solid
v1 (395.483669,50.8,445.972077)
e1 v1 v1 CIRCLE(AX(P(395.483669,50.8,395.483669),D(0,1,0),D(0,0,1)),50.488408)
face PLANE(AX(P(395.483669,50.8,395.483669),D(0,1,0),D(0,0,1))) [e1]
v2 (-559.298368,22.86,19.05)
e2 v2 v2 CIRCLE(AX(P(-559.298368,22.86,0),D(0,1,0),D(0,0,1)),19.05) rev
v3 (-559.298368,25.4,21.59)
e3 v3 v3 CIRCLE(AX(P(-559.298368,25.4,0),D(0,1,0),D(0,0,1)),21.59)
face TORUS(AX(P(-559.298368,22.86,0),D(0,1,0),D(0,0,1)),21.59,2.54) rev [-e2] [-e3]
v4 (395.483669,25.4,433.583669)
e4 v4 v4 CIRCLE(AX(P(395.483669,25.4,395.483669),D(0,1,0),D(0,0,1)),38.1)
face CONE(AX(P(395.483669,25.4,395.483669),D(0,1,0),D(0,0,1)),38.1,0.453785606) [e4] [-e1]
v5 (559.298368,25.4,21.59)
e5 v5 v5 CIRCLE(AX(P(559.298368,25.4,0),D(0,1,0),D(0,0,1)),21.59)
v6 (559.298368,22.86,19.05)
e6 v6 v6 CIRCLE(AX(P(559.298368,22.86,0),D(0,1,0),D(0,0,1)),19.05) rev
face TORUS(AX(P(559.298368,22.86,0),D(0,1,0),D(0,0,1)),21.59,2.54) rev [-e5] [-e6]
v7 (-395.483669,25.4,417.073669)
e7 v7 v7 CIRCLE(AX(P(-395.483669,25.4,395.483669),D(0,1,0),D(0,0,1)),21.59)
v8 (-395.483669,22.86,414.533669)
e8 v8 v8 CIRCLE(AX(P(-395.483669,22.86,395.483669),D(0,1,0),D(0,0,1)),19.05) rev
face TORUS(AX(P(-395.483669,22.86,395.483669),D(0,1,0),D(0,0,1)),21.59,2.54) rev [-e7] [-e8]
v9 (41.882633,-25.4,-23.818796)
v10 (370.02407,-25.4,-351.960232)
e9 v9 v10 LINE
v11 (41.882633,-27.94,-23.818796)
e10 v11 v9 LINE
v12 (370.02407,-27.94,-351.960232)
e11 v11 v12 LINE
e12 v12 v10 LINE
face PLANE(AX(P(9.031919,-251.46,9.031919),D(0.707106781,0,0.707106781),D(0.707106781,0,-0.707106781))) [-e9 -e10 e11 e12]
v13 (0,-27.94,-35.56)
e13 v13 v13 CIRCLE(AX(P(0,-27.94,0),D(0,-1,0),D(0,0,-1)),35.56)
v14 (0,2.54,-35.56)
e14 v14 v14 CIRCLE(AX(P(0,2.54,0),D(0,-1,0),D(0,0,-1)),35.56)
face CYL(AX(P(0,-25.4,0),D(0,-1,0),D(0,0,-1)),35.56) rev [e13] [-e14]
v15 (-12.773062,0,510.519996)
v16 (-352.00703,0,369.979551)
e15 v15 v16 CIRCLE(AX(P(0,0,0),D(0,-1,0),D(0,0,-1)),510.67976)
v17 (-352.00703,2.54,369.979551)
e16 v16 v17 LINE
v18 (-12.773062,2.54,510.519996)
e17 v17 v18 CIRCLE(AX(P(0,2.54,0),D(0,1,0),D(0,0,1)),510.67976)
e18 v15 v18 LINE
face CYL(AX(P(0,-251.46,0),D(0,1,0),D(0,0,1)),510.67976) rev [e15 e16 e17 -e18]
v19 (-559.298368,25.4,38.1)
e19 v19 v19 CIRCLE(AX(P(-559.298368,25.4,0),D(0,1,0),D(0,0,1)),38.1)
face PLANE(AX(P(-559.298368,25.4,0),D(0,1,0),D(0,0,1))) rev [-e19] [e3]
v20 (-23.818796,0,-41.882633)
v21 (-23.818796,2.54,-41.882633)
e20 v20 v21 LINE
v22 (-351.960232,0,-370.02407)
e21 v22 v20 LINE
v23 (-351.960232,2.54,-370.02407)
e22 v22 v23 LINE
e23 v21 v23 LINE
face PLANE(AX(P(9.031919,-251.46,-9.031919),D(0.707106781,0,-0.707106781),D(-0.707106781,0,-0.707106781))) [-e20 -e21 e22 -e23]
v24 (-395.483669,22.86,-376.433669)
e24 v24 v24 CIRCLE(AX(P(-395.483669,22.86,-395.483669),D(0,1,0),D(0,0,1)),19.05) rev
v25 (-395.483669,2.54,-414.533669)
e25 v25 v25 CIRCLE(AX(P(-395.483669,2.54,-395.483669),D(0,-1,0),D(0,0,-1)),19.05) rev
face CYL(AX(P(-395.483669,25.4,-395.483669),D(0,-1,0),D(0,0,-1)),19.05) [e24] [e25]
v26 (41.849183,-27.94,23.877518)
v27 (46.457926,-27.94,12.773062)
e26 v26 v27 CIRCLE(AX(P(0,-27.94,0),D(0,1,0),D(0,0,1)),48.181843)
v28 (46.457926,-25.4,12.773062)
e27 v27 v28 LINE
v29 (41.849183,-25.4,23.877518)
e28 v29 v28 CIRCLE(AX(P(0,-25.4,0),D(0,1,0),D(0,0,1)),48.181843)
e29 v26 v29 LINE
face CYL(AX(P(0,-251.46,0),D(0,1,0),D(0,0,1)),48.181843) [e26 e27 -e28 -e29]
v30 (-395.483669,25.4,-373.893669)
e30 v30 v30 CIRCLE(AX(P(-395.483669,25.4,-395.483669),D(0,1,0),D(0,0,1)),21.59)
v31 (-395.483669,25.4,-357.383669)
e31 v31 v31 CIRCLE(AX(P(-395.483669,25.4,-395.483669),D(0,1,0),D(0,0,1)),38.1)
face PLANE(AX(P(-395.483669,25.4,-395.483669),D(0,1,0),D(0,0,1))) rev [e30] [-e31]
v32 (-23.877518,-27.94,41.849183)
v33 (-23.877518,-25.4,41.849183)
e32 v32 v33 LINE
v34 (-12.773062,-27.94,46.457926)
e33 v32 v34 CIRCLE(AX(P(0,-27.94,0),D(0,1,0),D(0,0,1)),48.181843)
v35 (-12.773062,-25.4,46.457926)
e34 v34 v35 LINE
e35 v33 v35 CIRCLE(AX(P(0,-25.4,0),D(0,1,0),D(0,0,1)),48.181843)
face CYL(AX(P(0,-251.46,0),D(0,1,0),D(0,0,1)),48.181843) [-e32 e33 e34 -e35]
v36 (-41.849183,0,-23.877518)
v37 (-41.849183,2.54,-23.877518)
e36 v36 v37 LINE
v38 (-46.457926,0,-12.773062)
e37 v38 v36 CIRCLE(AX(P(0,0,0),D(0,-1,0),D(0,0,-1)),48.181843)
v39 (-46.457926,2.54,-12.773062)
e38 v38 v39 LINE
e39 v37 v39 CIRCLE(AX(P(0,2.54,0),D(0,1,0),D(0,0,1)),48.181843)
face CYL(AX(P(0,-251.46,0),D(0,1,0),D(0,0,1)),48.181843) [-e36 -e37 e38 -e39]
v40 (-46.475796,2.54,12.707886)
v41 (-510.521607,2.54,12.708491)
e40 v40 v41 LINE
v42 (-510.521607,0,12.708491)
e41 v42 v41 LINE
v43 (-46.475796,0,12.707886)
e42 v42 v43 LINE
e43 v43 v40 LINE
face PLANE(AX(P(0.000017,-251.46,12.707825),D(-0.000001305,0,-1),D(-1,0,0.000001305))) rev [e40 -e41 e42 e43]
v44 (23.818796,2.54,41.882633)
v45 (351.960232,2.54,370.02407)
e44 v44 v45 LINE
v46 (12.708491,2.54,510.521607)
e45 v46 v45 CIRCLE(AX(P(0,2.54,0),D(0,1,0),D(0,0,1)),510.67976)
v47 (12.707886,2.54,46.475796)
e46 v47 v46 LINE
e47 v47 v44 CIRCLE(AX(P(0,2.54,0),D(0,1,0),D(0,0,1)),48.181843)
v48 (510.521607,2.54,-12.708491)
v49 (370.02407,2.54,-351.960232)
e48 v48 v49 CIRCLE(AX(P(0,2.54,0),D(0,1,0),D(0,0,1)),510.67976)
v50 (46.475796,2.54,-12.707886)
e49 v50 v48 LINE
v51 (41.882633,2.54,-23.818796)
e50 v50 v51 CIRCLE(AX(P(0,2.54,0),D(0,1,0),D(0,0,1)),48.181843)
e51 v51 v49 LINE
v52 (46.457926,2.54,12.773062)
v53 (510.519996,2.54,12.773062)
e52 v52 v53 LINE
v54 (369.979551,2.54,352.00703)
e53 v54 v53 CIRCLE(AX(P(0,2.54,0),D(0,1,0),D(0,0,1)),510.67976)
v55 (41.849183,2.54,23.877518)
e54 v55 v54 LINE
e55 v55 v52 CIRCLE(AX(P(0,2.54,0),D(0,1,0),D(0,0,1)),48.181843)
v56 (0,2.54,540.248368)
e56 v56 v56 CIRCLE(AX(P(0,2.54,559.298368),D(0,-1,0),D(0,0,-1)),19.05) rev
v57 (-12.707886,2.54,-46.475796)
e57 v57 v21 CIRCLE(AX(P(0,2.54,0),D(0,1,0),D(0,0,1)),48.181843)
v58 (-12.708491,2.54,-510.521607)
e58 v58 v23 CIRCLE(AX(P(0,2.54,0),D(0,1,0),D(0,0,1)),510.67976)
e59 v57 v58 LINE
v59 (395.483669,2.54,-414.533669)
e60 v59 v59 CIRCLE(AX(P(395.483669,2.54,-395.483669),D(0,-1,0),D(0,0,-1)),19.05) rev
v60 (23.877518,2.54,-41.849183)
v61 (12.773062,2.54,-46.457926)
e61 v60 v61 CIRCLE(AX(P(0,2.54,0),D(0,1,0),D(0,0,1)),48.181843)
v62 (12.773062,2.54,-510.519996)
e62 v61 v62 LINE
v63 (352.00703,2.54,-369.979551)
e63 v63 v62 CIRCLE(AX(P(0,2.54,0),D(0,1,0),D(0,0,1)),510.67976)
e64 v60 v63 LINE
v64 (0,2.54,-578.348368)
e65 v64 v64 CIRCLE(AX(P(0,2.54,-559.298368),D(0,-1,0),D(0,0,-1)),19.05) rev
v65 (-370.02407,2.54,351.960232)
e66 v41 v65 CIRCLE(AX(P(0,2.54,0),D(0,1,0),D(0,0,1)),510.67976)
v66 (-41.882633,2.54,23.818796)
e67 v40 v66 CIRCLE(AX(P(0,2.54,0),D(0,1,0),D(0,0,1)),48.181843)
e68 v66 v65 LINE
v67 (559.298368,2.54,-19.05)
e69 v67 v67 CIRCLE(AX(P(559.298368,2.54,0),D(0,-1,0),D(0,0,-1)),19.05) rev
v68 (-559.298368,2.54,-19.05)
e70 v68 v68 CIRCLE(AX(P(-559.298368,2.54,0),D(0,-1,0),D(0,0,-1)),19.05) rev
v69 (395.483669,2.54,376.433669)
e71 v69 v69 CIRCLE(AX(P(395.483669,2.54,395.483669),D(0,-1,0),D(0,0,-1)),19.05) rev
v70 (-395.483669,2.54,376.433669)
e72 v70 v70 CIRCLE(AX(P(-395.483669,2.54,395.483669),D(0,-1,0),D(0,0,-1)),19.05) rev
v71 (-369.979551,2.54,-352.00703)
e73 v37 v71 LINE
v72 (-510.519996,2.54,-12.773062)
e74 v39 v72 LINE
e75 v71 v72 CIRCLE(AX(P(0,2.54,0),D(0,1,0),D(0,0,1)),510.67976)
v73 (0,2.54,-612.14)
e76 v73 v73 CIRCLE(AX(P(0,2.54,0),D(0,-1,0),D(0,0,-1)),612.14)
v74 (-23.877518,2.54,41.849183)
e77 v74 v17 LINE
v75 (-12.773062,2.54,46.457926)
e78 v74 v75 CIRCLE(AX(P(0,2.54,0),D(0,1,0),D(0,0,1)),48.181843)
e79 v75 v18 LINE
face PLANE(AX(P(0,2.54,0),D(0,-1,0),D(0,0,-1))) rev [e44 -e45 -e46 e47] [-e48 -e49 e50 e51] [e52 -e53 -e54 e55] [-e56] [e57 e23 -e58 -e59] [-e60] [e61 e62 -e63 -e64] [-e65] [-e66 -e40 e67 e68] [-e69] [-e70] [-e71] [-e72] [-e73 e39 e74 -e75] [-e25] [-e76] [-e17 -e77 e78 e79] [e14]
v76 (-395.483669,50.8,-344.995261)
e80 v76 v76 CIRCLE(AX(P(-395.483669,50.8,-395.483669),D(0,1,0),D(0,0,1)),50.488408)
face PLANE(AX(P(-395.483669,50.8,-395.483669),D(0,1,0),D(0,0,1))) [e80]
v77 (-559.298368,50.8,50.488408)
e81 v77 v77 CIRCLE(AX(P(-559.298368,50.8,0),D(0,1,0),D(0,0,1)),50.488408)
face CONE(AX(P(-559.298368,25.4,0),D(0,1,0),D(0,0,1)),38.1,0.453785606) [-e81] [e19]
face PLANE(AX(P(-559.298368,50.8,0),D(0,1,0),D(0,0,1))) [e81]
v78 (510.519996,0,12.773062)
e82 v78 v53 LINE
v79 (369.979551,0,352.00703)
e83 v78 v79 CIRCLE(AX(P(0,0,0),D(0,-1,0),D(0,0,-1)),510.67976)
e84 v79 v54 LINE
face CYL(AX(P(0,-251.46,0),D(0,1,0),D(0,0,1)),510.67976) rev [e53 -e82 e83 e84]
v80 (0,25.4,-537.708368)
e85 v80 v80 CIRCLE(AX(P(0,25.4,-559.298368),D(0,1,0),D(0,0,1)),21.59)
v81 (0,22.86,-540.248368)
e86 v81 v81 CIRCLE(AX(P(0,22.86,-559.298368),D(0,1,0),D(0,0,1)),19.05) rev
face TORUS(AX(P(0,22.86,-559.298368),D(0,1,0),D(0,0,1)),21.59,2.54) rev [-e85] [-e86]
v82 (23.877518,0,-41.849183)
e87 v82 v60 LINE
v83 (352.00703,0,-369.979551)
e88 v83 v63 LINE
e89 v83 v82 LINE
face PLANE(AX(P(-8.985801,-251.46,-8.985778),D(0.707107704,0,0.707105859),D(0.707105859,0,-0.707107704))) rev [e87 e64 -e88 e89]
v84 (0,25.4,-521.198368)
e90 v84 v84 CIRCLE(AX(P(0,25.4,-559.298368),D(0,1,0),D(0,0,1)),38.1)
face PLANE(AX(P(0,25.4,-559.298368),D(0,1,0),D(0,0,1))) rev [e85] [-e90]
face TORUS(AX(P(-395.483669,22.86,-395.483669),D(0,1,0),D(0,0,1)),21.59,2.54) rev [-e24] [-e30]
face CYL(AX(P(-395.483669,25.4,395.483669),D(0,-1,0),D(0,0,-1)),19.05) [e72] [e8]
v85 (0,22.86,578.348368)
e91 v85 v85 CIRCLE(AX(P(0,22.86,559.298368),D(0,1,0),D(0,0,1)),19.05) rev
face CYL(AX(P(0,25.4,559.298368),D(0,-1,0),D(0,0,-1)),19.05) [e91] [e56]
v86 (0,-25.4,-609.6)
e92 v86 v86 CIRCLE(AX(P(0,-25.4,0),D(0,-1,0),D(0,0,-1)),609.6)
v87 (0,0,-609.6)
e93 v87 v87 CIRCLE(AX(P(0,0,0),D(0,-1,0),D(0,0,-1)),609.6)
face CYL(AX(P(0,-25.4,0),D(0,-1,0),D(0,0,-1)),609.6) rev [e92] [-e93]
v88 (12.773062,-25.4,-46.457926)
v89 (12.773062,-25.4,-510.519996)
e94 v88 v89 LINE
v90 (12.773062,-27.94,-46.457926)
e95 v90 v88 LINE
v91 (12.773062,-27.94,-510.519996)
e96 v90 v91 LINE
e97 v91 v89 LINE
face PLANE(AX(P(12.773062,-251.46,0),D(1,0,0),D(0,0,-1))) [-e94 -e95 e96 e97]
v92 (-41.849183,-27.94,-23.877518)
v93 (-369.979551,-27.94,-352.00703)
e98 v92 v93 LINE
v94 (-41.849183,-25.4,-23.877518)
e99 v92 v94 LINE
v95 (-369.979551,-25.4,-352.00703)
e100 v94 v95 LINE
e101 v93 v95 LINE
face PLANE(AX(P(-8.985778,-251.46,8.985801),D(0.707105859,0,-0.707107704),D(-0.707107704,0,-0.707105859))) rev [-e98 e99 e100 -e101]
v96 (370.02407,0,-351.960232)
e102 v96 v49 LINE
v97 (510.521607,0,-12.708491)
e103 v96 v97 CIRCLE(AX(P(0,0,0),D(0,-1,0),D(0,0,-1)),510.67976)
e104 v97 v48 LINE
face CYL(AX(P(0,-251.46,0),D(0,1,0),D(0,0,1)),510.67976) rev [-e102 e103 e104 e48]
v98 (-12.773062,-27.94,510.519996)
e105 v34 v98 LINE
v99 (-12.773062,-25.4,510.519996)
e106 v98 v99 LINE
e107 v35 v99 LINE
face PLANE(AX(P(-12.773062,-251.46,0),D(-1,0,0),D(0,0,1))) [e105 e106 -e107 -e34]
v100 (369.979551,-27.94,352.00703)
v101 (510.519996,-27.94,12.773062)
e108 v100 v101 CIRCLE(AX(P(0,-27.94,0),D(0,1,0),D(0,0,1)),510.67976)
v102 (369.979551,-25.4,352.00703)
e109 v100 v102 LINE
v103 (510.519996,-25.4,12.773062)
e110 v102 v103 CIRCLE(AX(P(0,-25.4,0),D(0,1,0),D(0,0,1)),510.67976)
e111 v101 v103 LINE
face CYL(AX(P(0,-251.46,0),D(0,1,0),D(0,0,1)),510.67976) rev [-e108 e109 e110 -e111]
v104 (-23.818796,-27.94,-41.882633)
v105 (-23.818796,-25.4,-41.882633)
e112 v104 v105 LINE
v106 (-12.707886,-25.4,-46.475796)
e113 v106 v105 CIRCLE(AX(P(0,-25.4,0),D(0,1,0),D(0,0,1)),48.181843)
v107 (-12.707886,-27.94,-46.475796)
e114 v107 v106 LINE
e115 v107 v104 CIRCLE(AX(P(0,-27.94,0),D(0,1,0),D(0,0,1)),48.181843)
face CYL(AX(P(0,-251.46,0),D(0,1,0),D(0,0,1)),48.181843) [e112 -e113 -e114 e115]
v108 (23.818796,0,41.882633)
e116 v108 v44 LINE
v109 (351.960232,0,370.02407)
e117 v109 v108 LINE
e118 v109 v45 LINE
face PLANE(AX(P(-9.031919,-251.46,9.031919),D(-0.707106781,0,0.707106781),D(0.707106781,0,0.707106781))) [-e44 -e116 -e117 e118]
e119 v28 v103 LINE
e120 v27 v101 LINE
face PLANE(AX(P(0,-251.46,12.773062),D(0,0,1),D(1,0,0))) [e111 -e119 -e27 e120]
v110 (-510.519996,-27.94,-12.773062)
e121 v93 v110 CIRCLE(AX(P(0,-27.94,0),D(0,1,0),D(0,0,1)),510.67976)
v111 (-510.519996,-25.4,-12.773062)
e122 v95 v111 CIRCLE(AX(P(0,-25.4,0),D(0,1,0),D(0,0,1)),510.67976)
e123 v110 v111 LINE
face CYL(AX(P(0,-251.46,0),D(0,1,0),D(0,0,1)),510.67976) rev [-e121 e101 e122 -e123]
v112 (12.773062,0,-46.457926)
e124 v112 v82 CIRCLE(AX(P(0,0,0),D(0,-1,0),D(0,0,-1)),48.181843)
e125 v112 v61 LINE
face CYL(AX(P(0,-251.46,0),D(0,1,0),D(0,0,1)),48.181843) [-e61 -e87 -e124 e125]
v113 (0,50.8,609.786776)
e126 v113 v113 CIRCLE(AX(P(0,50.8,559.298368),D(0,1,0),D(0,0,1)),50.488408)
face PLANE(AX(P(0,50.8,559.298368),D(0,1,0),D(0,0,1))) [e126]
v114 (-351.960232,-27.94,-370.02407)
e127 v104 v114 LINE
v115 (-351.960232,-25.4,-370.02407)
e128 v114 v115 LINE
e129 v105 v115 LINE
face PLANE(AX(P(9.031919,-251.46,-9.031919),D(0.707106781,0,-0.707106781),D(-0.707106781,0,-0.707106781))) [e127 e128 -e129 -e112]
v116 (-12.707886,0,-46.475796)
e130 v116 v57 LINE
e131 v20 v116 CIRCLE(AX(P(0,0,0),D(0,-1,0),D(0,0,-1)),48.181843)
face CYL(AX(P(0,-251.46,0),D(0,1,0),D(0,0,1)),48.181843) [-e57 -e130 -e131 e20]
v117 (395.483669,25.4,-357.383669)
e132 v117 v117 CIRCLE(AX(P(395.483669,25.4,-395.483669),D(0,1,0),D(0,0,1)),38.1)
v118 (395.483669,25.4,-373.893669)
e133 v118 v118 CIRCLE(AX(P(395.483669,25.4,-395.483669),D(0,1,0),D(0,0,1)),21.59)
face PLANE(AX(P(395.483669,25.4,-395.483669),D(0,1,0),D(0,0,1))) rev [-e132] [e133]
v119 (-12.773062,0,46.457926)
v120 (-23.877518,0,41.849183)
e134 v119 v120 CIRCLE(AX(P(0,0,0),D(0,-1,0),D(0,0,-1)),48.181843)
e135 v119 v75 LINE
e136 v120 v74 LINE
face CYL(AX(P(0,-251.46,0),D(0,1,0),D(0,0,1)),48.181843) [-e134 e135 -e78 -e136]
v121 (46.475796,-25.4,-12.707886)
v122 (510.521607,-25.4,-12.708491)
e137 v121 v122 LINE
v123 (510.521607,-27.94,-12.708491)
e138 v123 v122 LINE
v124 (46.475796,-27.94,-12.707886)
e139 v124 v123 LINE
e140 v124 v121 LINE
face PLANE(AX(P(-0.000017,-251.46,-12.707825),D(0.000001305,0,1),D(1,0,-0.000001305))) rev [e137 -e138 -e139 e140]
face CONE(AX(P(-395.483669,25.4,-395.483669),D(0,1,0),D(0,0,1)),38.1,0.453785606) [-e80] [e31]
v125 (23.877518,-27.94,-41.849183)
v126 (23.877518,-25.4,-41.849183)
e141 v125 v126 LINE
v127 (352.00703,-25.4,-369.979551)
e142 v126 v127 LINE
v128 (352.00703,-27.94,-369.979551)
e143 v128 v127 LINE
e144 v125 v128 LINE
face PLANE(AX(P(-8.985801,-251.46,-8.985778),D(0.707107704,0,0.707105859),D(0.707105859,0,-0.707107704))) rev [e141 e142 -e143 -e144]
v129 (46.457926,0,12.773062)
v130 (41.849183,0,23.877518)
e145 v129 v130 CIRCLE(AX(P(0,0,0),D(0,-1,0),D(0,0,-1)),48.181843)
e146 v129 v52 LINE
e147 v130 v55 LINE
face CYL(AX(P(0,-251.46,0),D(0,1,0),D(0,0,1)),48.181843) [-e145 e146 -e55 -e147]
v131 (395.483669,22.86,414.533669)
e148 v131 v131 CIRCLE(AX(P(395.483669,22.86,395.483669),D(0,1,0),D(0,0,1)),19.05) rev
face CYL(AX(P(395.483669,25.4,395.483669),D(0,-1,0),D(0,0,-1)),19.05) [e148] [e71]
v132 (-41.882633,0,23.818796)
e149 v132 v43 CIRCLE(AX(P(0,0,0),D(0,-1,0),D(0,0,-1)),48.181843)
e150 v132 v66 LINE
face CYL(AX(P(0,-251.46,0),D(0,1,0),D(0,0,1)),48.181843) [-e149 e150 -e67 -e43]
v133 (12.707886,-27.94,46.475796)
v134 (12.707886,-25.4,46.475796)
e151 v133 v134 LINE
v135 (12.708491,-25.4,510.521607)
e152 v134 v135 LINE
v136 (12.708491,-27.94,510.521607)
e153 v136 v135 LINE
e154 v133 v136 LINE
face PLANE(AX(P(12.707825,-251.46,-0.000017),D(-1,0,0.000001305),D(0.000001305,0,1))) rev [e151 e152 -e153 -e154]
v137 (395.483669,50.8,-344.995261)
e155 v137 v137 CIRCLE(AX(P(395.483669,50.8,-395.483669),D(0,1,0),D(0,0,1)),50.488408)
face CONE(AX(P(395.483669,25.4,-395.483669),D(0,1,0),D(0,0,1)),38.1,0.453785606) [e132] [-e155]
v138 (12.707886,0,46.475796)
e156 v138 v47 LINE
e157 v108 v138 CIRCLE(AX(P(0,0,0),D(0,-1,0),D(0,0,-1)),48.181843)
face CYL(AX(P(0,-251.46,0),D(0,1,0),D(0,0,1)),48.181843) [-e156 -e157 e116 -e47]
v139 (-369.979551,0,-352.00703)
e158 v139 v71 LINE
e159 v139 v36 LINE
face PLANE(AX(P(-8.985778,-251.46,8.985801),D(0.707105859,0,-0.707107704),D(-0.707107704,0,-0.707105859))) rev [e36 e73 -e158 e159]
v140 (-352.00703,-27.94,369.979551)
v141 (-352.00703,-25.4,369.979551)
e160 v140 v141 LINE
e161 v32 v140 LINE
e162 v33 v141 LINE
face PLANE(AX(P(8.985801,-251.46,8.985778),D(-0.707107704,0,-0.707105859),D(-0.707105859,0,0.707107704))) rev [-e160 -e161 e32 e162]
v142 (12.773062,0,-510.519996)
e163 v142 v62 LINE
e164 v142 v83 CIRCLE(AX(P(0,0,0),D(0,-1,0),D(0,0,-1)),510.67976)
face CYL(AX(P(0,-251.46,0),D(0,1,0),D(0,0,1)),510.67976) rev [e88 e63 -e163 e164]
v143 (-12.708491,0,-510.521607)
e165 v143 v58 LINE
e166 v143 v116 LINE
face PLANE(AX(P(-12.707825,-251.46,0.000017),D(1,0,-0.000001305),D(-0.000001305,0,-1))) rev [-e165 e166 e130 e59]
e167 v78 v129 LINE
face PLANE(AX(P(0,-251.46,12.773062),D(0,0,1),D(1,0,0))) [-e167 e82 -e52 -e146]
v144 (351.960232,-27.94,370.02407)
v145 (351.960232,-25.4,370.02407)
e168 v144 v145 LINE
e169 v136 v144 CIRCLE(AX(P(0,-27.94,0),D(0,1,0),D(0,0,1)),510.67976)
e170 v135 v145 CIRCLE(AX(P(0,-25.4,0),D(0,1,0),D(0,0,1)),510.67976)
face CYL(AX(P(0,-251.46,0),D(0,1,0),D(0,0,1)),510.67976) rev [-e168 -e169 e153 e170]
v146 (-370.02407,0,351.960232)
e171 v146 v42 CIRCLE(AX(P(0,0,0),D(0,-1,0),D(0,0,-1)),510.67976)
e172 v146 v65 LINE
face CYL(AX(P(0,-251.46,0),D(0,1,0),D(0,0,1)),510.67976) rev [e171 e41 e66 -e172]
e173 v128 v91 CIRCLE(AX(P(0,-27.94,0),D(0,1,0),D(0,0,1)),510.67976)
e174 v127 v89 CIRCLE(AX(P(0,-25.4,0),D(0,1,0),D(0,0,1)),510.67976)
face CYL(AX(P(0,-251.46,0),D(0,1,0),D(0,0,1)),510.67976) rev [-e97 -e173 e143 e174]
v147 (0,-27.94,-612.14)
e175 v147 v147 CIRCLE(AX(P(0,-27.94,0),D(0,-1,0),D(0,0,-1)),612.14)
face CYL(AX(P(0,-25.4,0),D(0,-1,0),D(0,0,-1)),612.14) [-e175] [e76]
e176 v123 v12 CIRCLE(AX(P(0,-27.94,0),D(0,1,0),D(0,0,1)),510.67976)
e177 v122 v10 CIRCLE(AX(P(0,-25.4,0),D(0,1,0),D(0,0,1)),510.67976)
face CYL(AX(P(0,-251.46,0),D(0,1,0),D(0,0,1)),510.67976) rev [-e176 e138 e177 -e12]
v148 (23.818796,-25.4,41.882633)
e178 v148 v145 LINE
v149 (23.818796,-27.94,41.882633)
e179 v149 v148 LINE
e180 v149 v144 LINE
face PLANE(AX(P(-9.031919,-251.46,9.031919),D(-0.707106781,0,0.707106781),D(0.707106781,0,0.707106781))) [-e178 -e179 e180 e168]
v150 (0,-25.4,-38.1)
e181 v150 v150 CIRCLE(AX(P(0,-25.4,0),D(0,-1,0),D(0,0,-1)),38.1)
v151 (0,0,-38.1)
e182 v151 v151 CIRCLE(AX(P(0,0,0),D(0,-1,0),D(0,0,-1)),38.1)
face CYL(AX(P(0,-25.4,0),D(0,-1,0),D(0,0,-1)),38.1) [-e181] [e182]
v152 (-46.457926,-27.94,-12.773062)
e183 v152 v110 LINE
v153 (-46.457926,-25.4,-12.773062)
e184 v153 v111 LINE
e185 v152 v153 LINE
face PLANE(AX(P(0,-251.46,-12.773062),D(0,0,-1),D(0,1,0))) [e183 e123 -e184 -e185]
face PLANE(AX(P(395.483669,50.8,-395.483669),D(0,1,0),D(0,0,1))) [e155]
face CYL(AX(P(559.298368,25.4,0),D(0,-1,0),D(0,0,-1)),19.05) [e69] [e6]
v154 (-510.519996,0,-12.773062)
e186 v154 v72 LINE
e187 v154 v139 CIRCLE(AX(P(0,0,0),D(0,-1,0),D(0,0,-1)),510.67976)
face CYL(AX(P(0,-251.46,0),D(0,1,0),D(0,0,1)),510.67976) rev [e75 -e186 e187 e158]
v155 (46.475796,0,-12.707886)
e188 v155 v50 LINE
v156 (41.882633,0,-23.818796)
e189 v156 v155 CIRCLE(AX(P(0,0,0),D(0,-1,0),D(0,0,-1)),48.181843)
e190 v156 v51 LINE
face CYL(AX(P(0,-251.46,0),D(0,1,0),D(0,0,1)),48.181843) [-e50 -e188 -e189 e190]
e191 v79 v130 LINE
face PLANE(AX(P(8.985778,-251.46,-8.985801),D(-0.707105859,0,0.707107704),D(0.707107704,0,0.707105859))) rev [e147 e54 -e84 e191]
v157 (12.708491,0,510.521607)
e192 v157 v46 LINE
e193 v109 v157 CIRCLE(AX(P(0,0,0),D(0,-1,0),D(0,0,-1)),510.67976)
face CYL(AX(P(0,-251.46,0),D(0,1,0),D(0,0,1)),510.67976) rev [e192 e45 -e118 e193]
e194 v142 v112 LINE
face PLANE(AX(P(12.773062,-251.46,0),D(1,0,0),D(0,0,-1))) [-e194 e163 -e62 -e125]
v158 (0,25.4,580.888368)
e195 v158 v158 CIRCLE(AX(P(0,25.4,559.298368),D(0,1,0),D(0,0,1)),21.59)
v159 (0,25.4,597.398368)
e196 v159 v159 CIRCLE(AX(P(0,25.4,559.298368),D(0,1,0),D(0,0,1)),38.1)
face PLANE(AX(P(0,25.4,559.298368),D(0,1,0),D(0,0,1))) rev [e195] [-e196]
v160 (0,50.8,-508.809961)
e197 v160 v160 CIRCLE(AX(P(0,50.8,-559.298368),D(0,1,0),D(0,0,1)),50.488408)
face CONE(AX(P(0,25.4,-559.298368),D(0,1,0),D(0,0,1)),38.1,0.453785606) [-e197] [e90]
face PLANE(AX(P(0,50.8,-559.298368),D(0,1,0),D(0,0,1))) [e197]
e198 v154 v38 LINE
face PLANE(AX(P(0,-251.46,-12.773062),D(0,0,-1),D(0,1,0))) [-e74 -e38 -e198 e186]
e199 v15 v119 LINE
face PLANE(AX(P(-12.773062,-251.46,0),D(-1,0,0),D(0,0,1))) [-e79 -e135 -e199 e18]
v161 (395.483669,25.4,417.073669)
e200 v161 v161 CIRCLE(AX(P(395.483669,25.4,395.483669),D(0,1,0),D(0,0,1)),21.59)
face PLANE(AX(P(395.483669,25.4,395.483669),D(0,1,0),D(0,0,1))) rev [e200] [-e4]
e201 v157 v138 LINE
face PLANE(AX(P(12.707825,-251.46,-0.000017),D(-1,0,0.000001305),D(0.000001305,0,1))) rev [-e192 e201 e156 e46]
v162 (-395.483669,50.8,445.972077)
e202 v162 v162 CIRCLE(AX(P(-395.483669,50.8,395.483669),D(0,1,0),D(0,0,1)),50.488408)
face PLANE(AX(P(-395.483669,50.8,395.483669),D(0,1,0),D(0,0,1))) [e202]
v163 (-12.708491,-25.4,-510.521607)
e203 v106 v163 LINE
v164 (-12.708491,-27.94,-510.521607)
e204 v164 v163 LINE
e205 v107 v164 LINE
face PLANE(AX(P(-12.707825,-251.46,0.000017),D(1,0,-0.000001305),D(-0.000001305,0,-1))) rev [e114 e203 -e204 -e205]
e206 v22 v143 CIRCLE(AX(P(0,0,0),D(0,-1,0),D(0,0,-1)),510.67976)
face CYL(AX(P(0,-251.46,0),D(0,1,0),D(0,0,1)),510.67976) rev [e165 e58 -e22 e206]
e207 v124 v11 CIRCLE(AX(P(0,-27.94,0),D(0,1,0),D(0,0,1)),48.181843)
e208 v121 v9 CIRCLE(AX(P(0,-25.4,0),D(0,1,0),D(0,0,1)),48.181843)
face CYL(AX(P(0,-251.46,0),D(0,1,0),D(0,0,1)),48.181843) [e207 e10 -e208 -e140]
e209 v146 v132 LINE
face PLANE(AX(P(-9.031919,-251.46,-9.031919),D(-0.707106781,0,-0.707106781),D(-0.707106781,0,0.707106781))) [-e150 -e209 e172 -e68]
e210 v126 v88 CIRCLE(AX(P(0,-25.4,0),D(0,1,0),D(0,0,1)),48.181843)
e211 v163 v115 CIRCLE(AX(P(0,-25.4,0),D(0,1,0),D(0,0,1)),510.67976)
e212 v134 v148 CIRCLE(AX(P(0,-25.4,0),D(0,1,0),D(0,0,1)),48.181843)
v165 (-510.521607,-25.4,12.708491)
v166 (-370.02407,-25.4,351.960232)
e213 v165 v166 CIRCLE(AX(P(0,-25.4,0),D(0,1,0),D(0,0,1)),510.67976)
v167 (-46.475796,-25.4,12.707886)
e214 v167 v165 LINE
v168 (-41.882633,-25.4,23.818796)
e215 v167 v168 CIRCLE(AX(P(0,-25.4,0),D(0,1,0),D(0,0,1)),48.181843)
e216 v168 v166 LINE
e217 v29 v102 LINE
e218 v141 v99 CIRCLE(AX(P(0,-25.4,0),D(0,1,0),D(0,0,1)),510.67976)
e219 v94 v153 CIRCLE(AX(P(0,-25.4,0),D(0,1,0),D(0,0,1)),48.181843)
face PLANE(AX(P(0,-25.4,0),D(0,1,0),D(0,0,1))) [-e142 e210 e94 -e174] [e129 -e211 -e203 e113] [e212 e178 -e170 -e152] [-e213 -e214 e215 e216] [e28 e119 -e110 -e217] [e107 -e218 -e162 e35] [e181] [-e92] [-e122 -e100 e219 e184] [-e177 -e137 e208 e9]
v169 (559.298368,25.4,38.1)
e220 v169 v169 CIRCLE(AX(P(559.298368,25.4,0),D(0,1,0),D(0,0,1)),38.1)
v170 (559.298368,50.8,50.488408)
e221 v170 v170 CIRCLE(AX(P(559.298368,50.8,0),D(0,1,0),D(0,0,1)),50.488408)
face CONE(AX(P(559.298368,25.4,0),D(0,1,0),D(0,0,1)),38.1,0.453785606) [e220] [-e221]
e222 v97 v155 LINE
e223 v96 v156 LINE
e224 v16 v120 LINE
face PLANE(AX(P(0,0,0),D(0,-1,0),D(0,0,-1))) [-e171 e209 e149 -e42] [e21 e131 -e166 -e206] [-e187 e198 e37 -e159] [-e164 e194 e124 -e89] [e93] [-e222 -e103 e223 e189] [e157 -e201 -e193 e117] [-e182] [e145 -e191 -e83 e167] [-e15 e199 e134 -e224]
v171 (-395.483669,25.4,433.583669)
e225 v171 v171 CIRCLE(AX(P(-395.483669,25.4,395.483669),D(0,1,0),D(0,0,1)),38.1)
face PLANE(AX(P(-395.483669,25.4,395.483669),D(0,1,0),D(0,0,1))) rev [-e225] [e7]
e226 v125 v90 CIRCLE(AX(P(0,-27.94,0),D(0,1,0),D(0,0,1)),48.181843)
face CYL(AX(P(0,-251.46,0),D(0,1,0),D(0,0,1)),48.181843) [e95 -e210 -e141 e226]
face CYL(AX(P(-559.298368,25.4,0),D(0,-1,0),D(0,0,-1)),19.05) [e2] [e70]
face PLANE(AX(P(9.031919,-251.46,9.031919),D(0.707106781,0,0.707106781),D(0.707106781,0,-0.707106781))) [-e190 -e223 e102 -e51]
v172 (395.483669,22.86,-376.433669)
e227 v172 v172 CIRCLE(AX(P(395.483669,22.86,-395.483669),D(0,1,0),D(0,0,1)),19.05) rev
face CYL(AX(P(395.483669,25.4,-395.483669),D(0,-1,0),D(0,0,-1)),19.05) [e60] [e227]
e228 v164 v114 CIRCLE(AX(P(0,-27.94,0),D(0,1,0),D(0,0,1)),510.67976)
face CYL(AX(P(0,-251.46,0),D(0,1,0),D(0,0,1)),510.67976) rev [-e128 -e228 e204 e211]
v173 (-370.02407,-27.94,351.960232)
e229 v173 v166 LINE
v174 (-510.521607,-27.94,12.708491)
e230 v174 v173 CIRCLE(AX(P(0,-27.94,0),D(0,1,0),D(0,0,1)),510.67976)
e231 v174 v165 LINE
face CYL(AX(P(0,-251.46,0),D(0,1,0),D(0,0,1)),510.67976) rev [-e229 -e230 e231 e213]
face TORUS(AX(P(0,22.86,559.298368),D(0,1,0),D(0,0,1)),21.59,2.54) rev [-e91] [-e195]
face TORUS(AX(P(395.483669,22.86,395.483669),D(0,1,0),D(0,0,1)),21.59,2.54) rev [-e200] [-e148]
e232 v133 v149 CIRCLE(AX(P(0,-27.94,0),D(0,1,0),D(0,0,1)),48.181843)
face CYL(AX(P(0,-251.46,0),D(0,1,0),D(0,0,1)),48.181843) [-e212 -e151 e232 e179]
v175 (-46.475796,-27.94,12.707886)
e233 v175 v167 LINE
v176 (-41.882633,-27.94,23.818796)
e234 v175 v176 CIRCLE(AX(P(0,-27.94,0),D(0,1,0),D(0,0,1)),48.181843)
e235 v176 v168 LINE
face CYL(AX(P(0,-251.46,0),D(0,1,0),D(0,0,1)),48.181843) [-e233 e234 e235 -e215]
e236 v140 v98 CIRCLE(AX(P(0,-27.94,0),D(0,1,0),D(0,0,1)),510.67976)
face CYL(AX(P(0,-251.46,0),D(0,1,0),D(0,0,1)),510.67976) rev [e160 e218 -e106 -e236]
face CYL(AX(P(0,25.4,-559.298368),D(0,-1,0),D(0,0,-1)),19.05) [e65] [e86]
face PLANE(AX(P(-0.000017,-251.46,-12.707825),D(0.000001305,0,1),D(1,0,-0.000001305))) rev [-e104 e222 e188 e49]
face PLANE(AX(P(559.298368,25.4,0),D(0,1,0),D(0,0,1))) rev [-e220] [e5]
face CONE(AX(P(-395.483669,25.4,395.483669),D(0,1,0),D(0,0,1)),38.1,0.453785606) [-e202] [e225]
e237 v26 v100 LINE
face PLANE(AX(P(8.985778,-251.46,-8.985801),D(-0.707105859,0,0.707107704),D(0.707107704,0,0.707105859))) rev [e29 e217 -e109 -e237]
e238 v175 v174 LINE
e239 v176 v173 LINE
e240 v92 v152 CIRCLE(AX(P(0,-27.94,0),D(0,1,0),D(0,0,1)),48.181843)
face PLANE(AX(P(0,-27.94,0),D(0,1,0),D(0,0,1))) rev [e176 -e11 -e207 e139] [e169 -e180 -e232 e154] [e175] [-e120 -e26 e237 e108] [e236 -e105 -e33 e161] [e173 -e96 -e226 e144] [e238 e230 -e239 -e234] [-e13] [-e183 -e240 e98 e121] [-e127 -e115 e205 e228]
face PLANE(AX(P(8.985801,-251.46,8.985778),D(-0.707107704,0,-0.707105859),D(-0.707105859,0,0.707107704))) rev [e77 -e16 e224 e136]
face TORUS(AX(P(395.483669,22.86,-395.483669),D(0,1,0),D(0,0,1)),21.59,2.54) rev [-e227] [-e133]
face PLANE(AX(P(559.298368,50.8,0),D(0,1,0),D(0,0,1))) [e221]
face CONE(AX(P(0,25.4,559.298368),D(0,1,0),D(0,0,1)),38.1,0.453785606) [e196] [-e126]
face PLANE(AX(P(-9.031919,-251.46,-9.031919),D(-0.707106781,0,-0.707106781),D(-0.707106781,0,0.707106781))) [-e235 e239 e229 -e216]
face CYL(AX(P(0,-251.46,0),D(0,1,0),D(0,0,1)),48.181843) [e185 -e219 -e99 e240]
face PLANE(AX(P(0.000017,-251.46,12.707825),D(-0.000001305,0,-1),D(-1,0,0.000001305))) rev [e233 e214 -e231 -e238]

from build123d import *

# Parameters (mm, degrees)
REVOLVE_THIN1_START           = -27.94
REVOLVE_THIN1_OUTLINE_R       = 612.14
REVOLVE_THIN1_OUTLINE_R_2     = 35.56
REVOLVE_THIN1_DEPTH           = 2.54
REVOLVE_THIN1_2_OUTLINE_R     = 612.14
REVOLVE_THIN1_2_OUTLINE_R_2   = 35.56
REVOLVE_THIN1_2_DEPTH         = 2.54
REVOLVE_THIN1_START_2         = -25.4
REVOLVE_THIN1_3_OUTLINE_R     = 612.14
REVOLVE_THIN1_3_OUTLINE_R_2   = 609.6
REVOLVE_THIN1_3_OUTLINE_R_3   = 38.1
REVOLVE_THIN1_3_OUTLINE_R_4   = 35.56
REVOLVE_THIN1_3_DEPTH         = 25.4
CUT_EXTRUDE4_DEPTH            = 254
SKETCH4_R                     = 19.05
BOSS_EXTRUDE1_DEPTH           = 25.4
SKETCH5_R                     = 38.1
BOSS_EXTRUDE2_DEPTH           = 25.4
BOSS_EXTRUDE2_DRAFT           = -26
BOSS_EXTRUDE2_PROFILE_2_DEPTH = 25.4
BOSS_EXTRUDE2_PROFILE_2_DRAFT = -26
BOSS_EXTRUDE2_PROFILE_3_DEPTH = 25.4
BOSS_EXTRUDE2_PROFILE_3_DRAFT = -26
BOSS_EXTRUDE2_PROFILE_4_DEPTH = 25.4
BOSS_EXTRUDE2_PROFILE_4_DRAFT = -26
BOSS_EXTRUDE2_PROFILE_5_DEPTH = 25.4
BOSS_EXTRUDE2_PROFILE_5_DRAFT = -26
BOSS_EXTRUDE2_PROFILE_6_DEPTH = 25.4
BOSS_EXTRUDE2_PROFILE_6_DRAFT = -26
BOSS_EXTRUDE2_PROFILE_7_DEPTH = 25.4
BOSS_EXTRUDE2_PROFILE_7_DRAFT = -26
BOSS_EXTRUDE2_PROFILE_8_DEPTH = 25.4
BOSS_EXTRUDE2_PROFILE_8_DRAFT = -26
FILLET1_R                     = 2.54
FILLET2_R                     = 2.54


# Read off the part's stored shape, not the designer's step: Revolve-Thin1
with BuildPart() as part:
    # Revolve-Thin1 outline → Revolve-Thin1 (new body)
    with BuildSketch(Plane(origin=(0, 0, 0), x_dir=(1, 0, 0), z_dir=(0, 1, 0)).offset(REVOLVE_THIN1_START)):
        Circle(REVOLVE_THIN1_OUTLINE_R)
        Circle(REVOLVE_THIN1_OUTLINE_R_2, mode=Mode.SUBTRACT)
    extrude(amount=REVOLVE_THIN1_DEPTH)



with BuildPart() as body_2:
    # Revolve-Thin1 2 outline → Revolve-Thin1 2 (new body)
    with BuildSketch(Plane(origin=(0, 0, 0), x_dir=(1, 0, 0), z_dir=(0, 1, 0))):
        Circle(REVOLVE_THIN1_2_OUTLINE_R)
        Circle(REVOLVE_THIN1_2_OUTLINE_R_2, mode=Mode.SUBTRACT)
    extrude(amount=REVOLVE_THIN1_2_DEPTH)


with BuildPart() as part_1:
    add(part.part)

    add(body_2.part)  # Revolve-Thin1 3 merges body 2
    # Revolve-Thin1 3 outline → Revolve-Thin1 3 (add)
    # profile 1 of 2: a face of its own
    with BuildSketch(Plane(origin=(0, 0, 0), x_dir=(1, 0, 0), z_dir=(0, 1, 0)).offset(REVOLVE_THIN1_START_2)):
        Circle(REVOLVE_THIN1_3_OUTLINE_R)
        Circle(REVOLVE_THIN1_3_OUTLINE_R_2, mode=Mode.SUBTRACT)
    # profile 2 of 2: a face of its own
    with BuildSketch(Plane(origin=(0, 0, 0), x_dir=(1, 0, 0), z_dir=(0, 1, 0)).offset(REVOLVE_THIN1_START_2)):
        Circle(REVOLVE_THIN1_3_OUTLINE_R_3)
        Circle(REVOLVE_THIN1_3_OUTLINE_R_4, mode=Mode.SUBTRACT)
    extrude(amount=REVOLVE_THIN1_3_DEPTH)

    # Sketch3 → Cut-Extrude4 (cut)
    with BuildSketch(Plane(origin=(0, 2.54, 0), x_dir=(1, 0, 0), z_dir=(0, 1, 0))):
        with BuildLine():
            ThreePointArc((-12.707885841, 46.475796004), (-18.407169885, 44.527138619), (-23.818795726, 41.882632999))
            Line((-23.818795726, 41.882632999), (-351.960232421, 370.024069694))
            ThreePointArc((-351.960232421, 370.024069694), (-195.398846018, 471.818935963), (-12.708491222, 510.521607387))
            Line((-12.708491222, 510.521607387), (-12.707885841, 46.475796004))
        make_face()
        with BuildLine():
            Line((23.877518263, 41.849182768), (352.007030204, 369.979550847))
            ThreePointArc((352.007030204, 369.979550847), (195.458520056, 471.794218167), (12.77306183, 510.519995935))
            Line((12.77306183, 510.519995935), (12.77306183, 46.457925785))
            ThreePointArc((12.77306183, 46.457925785), (18.469607017, 44.501276312), (23.877518263, 41.849182768))
        make_face()
        with BuildLine():
            Line((46.475796004, 12.707885841), (510.521607387, 12.708491222))
            ThreePointArc((510.521607387, 12.708491222), (471.818935963, 195.398846018), (370.024069694, 351.960232421))
            Line((370.024069694, 351.960232421), (41.882632999, 23.818795726))
            ThreePointArc((41.882632999, 23.818795726), (44.527138619, 18.407169885), (46.475796004, 12.707885841))
        make_face()
        with BuildLine():
            Line((41.849182768, -23.877518263), (369.979550847, -352.007030204))
            ThreePointArc((369.979550847, -352.007030204), (471.794218167, -195.458520056), (510.519995935, -12.77306183))
            Line((510.519995935, -12.77306183), (46.457925785, -12.77306183))
            ThreePointArc((46.457925785, -12.77306183), (44.501276312, -18.469607017), (41.849182768, -23.877518263))
        make_face()
        with BuildLine():
            Line((12.707885841, -46.475796004), (12.708491222, -510.521607387))
            ThreePointArc((12.708491222, -510.521607387), (195.398846018, -471.818935963), (351.960232421, -370.024069694))
            Line((351.960232421, -370.024069694), (23.818795726, -41.882632999))
            ThreePointArc((23.818795726, -41.882632999), (18.407169885, -44.527138619), (12.707885841, -46.475796004))
        make_face()
        with BuildLine():
            Line((-23.877518263, -41.849182768), (-352.007030204, -369.979550847))
            ThreePointArc((-352.007030204, -369.979550847), (-195.458520056, -471.794218167), (-12.77306183, -510.519995935))
            Line((-12.77306183, -510.519995935), (-12.77306183, -46.457925785))
            ThreePointArc((-12.77306183, -46.457925785), (-18.469607017, -44.501276312), (-23.877518263, -41.849182768))
        make_face()
        with BuildLine():
            Line((-46.475796004, -12.707885841), (-510.521607387, -12.708491222))
            ThreePointArc((-510.521607387, -12.708491222), (-471.818935963, -195.398846018), (-370.024069694, -351.960232421))
            Line((-370.024069694, -351.960232421), (-41.882632999, -23.818795726))
            ThreePointArc((-41.882632999, -23.818795726), (-44.527138619, -18.407169885), (-46.475796004, -12.707885841))
        make_face()
        with BuildLine():
            ThreePointArc((-41.849182768, 23.877518263), (-44.501276312, 18.469607017), (-46.457925785, 12.77306183))
            Line((-46.457925785, 12.77306183), (-510.519995935, 12.77306183))
            ThreePointArc((-510.519995935, 12.77306183), (-471.794218167, 195.458520056), (-369.979550847, 352.007030204))
            Line((-369.979550847, 352.007030204), (-41.849182768, 23.877518263))
        make_face()
    extrude(amount=-CUT_EXTRUDE4_DEPTH, mode=Mode.SUBTRACT)

    # Sketch4 → Boss-Extrude1 (add)
    with BuildSketch(Plane(origin=(0, 0, 0), x_dir=(1, 0, 0), z_dir=(0, 1, 0))):
        with Locations(Location((0, 559.298368412, 0), (0, 0, 90))):
            Circle(SKETCH4_R)
        with Locations(Location((395.483669011, 395.483669011, 0), (0, 0, 90))):
            Circle(SKETCH4_R)
        with Locations(Location((559.298368412, 0, 0), (0, 0, 90))):
            Circle(SKETCH4_R)
        with Locations(Location((395.483669011, -395.483669011, 0), (0, 0, 90))):
            Circle(SKETCH4_R)
        with Locations(Location((0, -559.298368412, 0), (0, 0, 90))):
            Circle(SKETCH4_R)
        with Locations(Location((-395.483669011, -395.483669011, 0), (0, 0, 90))):
            Circle(SKETCH4_R)
        with Locations(Location((-559.298368412, 0, 0), (0, 0, 90))):
            Circle(SKETCH4_R)
        with Locations(Location((-395.483669011, 395.483669011, 0), (0, 0, 90))):
            Circle(SKETCH4_R)
    extrude(amount=BOSS_EXTRUDE1_DEPTH)


with BuildPart() as boss_extrude2_tool:
    # Sketch5 → Boss-Extrude2 (with draft: the straight prism first)
    with BuildSketch(Plane(origin=(0, 25.4, 0), x_dir=(1, 0, 0), z_dir=(0, 1, 0))):
        with Locations((0, 559.298368412)):
            Circle(SKETCH5_R)
    extrude(amount=BOSS_EXTRUDE2_DEPTH)
    # Boss-Extrude2: the draft: its side faces are tilted about the plane it starts from
    boss_extrude2_sides = [boss_extrude2_tool.faces().sort_by_distance(p)[0] for p in [
        (-38.1, 38.1, -559.298368412),
    ]]
    draft(boss_extrude2_sides, Plane(origin=(0, 25.4, 0), x_dir=(1, 0, 0), z_dir=(0, 1, 0)), BOSS_EXTRUDE2_DRAFT)


with BuildPart() as part_2:
    add(part_1.part)

    # Boss-Extrude2: add boss_extrude2_tool
    add(boss_extrude2_tool.part)


with BuildPart() as boss_extrude2_profile_2_tool:
    # Sketch5 → Boss-Extrude2 profile 2 (with draft: the straight prism first)
    with BuildSketch(Plane(origin=(0, 25.4, 0), x_dir=(1, 0, 0), z_dir=(0, 1, 0))):
        with Locations((395.483669011, 395.483669011)):
            Circle(SKETCH5_R)
    extrude(amount=BOSS_EXTRUDE2_PROFILE_2_DEPTH)
    # Boss-Extrude2 profile 2: the draft: its side faces are tilted about the plane it starts from
    boss_extrude2_profile_2_sides = [boss_extrude2_profile_2_tool.faces().sort_by_distance(p)[0] for p in [
        (357.383669011, 38.1, -395.483669011),
    ]]
    draft(boss_extrude2_profile_2_sides, Plane(origin=(0, 25.4, 0), x_dir=(1, 0, 0), z_dir=(0, 1, 0)), BOSS_EXTRUDE2_PROFILE_2_DRAFT)


with BuildPart() as part_3:
    add(part_2.part)

    # Boss-Extrude2 profile 2: add boss_extrude2_profile_2_tool
    add(boss_extrude2_profile_2_tool.part)


with BuildPart() as boss_extrude2_profile_3_tool:
    # Sketch5 → Boss-Extrude2 profile 3 (with draft: the straight prism first)
    with BuildSketch(Plane(origin=(0, 25.4, 0), x_dir=(1, 0, 0), z_dir=(0, 1, 0))):
        with Locations((559.298368412, 0)):
            Circle(SKETCH5_R)
    extrude(amount=BOSS_EXTRUDE2_PROFILE_3_DEPTH)
    # Boss-Extrude2 profile 3: the draft: its side faces are tilted about the plane it starts from
    boss_extrude2_profile_3_sides = [boss_extrude2_profile_3_tool.faces().sort_by_distance(p)[0] for p in [
        (521.198368412, 38.1, 0),
    ]]
    draft(boss_extrude2_profile_3_sides, Plane(origin=(0, 25.4, 0), x_dir=(1, 0, 0), z_dir=(0, 1, 0)), BOSS_EXTRUDE2_PROFILE_3_DRAFT)


with BuildPart() as part_4:
    add(part_3.part)

    # Boss-Extrude2 profile 3: add boss_extrude2_profile_3_tool
    add(boss_extrude2_profile_3_tool.part)


with BuildPart() as boss_extrude2_profile_4_tool:
    # Sketch5 → Boss-Extrude2 profile 4 (with draft: the straight prism first)
    with BuildSketch(Plane(origin=(0, 25.4, 0), x_dir=(1, 0, 0), z_dir=(0, 1, 0))):
        with Locations((395.483669011, -395.483669011)):
            Circle(SKETCH5_R)
    extrude(amount=BOSS_EXTRUDE2_PROFILE_4_DEPTH)
    # Boss-Extrude2 profile 4: the draft: its side faces are tilted about the plane it starts from
    boss_extrude2_profile_4_sides = [boss_extrude2_profile_4_tool.faces().sort_by_distance(p)[0] for p in [
        (357.383669011, 38.1, 395.483669011),
    ]]
    draft(boss_extrude2_profile_4_sides, Plane(origin=(0, 25.4, 0), x_dir=(1, 0, 0), z_dir=(0, 1, 0)), BOSS_EXTRUDE2_PROFILE_4_DRAFT)


with BuildPart() as part_5:
    add(part_4.part)

    # Boss-Extrude2 profile 4: add boss_extrude2_profile_4_tool
    add(boss_extrude2_profile_4_tool.part)


with BuildPart() as boss_extrude2_profile_5_tool:
    # Sketch5 → Boss-Extrude2 profile 5 (with draft: the straight prism first)
    with BuildSketch(Plane(origin=(0, 25.4, 0), x_dir=(1, 0, 0), z_dir=(0, 1, 0))):
        with Locations((0, -559.298368412)):
            Circle(SKETCH5_R)
    extrude(amount=BOSS_EXTRUDE2_PROFILE_5_DEPTH)
    # Boss-Extrude2 profile 5: the draft: its side faces are tilted about the plane it starts from
    boss_extrude2_profile_5_sides = [boss_extrude2_profile_5_tool.faces().sort_by_distance(p)[0] for p in [
        (-38.1, 38.1, 559.298368412),
    ]]
    draft(boss_extrude2_profile_5_sides, Plane(origin=(0, 25.4, 0), x_dir=(1, 0, 0), z_dir=(0, 1, 0)), BOSS_EXTRUDE2_PROFILE_5_DRAFT)


with BuildPart() as part_6:
    add(part_5.part)

    # Boss-Extrude2 profile 5: add boss_extrude2_profile_5_tool
    add(boss_extrude2_profile_5_tool.part)


with BuildPart() as boss_extrude2_profile_6_tool:
    # Sketch5 → Boss-Extrude2 profile 6 (with draft: the straight prism first)
    with BuildSketch(Plane(origin=(0, 25.4, 0), x_dir=(1, 0, 0), z_dir=(0, 1, 0))):
        with Locations((-395.48366901, -395.483669011)):
            Circle(SKETCH5_R)
    extrude(amount=BOSS_EXTRUDE2_PROFILE_6_DEPTH)
    # Boss-Extrude2 profile 6: the draft: its side faces are tilted about the plane it starts from
    boss_extrude2_profile_6_sides = [boss_extrude2_profile_6_tool.faces().sort_by_distance(p)[0] for p in [
        (-433.583669011, 38.1, 395.483669011),
    ]]
    draft(boss_extrude2_profile_6_sides, Plane(origin=(0, 25.4, 0), x_dir=(1, 0, 0), z_dir=(0, 1, 0)), BOSS_EXTRUDE2_PROFILE_6_DRAFT)


with BuildPart() as part_7:
    add(part_6.part)

    # Boss-Extrude2 profile 6: add boss_extrude2_profile_6_tool
    add(boss_extrude2_profile_6_tool.part)


with BuildPart() as boss_extrude2_profile_7_tool:
    # Sketch5 → Boss-Extrude2 profile 7 (with draft: the straight prism first)
    with BuildSketch(Plane(origin=(0, 25.4, 0), x_dir=(1, 0, 0), z_dir=(0, 1, 0))):
        with Locations((-559.298368412, 0)):
            Circle(SKETCH5_R)
    extrude(amount=BOSS_EXTRUDE2_PROFILE_7_DEPTH)
    # Boss-Extrude2 profile 7: the draft: its side faces are tilted about the plane it starts from
    boss_extrude2_profile_7_sides = [boss_extrude2_profile_7_tool.faces().sort_by_distance(p)[0] for p in [
        (-597.398368412, 38.1, 0),
    ]]
    draft(boss_extrude2_profile_7_sides, Plane(origin=(0, 25.4, 0), x_dir=(1, 0, 0), z_dir=(0, 1, 0)), BOSS_EXTRUDE2_PROFILE_7_DRAFT)


with BuildPart() as part_8:
    add(part_7.part)

    # Boss-Extrude2 profile 7: add boss_extrude2_profile_7_tool
    add(boss_extrude2_profile_7_tool.part)


with BuildPart() as boss_extrude2_profile_8_tool:
    # Sketch5 → Boss-Extrude2 profile 8 (with draft: the straight prism first)
    with BuildSketch(Plane(origin=(0, 25.4, 0), x_dir=(1, 0, 0), z_dir=(0, 1, 0))):
        with Locations((-395.483669011, 395.483669011)):
            Circle(SKETCH5_R)
    extrude(amount=BOSS_EXTRUDE2_PROFILE_8_DEPTH)
    # Boss-Extrude2 profile 8: the draft: its side faces are tilted about the plane it starts from
    boss_extrude2_profile_8_sides = [boss_extrude2_profile_8_tool.faces().sort_by_distance(p)[0] for p in [
        (-433.583669011, 38.1, -395.483669011),
    ]]
    draft(boss_extrude2_profile_8_sides, Plane(origin=(0, 25.4, 0), x_dir=(1, 0, 0), z_dir=(0, 1, 0)), BOSS_EXTRUDE2_PROFILE_8_DRAFT)


with BuildPart() as part_9:
    add(part_8.part)

    # Boss-Extrude2 profile 8: add boss_extrude2_profile_8_tool
    add(boss_extrude2_profile_8_tool.part)

    # Fillet1
    fillet1_edges = [part_9.edges().sort_by_distance(p)[0] for p in [
        (559.298368412, 25.4, 19.05),
    ]]
    fillet(fillet1_edges, radius=FILLET1_R)

    # Fillet2
    fillet2_edges = [part_9.edges().sort_by_distance(p)[0] for p in [
        (0, 25.4, -540.248368412),
        (395.483669011, 25.4, -376.433669011),
        (395.483669011, 25.4, 414.533669011),
        (0, 25.4, 578.348368412),
        (-395.483669011, 25.4, 414.533669011),
        (-559.298368412, 25.4, 19.05),
        (-395.483669011, 25.4, -376.433669011),
    ]]
    fillet(fillet2_edges, radius=FILLET2_R)


solid = part_9.part
